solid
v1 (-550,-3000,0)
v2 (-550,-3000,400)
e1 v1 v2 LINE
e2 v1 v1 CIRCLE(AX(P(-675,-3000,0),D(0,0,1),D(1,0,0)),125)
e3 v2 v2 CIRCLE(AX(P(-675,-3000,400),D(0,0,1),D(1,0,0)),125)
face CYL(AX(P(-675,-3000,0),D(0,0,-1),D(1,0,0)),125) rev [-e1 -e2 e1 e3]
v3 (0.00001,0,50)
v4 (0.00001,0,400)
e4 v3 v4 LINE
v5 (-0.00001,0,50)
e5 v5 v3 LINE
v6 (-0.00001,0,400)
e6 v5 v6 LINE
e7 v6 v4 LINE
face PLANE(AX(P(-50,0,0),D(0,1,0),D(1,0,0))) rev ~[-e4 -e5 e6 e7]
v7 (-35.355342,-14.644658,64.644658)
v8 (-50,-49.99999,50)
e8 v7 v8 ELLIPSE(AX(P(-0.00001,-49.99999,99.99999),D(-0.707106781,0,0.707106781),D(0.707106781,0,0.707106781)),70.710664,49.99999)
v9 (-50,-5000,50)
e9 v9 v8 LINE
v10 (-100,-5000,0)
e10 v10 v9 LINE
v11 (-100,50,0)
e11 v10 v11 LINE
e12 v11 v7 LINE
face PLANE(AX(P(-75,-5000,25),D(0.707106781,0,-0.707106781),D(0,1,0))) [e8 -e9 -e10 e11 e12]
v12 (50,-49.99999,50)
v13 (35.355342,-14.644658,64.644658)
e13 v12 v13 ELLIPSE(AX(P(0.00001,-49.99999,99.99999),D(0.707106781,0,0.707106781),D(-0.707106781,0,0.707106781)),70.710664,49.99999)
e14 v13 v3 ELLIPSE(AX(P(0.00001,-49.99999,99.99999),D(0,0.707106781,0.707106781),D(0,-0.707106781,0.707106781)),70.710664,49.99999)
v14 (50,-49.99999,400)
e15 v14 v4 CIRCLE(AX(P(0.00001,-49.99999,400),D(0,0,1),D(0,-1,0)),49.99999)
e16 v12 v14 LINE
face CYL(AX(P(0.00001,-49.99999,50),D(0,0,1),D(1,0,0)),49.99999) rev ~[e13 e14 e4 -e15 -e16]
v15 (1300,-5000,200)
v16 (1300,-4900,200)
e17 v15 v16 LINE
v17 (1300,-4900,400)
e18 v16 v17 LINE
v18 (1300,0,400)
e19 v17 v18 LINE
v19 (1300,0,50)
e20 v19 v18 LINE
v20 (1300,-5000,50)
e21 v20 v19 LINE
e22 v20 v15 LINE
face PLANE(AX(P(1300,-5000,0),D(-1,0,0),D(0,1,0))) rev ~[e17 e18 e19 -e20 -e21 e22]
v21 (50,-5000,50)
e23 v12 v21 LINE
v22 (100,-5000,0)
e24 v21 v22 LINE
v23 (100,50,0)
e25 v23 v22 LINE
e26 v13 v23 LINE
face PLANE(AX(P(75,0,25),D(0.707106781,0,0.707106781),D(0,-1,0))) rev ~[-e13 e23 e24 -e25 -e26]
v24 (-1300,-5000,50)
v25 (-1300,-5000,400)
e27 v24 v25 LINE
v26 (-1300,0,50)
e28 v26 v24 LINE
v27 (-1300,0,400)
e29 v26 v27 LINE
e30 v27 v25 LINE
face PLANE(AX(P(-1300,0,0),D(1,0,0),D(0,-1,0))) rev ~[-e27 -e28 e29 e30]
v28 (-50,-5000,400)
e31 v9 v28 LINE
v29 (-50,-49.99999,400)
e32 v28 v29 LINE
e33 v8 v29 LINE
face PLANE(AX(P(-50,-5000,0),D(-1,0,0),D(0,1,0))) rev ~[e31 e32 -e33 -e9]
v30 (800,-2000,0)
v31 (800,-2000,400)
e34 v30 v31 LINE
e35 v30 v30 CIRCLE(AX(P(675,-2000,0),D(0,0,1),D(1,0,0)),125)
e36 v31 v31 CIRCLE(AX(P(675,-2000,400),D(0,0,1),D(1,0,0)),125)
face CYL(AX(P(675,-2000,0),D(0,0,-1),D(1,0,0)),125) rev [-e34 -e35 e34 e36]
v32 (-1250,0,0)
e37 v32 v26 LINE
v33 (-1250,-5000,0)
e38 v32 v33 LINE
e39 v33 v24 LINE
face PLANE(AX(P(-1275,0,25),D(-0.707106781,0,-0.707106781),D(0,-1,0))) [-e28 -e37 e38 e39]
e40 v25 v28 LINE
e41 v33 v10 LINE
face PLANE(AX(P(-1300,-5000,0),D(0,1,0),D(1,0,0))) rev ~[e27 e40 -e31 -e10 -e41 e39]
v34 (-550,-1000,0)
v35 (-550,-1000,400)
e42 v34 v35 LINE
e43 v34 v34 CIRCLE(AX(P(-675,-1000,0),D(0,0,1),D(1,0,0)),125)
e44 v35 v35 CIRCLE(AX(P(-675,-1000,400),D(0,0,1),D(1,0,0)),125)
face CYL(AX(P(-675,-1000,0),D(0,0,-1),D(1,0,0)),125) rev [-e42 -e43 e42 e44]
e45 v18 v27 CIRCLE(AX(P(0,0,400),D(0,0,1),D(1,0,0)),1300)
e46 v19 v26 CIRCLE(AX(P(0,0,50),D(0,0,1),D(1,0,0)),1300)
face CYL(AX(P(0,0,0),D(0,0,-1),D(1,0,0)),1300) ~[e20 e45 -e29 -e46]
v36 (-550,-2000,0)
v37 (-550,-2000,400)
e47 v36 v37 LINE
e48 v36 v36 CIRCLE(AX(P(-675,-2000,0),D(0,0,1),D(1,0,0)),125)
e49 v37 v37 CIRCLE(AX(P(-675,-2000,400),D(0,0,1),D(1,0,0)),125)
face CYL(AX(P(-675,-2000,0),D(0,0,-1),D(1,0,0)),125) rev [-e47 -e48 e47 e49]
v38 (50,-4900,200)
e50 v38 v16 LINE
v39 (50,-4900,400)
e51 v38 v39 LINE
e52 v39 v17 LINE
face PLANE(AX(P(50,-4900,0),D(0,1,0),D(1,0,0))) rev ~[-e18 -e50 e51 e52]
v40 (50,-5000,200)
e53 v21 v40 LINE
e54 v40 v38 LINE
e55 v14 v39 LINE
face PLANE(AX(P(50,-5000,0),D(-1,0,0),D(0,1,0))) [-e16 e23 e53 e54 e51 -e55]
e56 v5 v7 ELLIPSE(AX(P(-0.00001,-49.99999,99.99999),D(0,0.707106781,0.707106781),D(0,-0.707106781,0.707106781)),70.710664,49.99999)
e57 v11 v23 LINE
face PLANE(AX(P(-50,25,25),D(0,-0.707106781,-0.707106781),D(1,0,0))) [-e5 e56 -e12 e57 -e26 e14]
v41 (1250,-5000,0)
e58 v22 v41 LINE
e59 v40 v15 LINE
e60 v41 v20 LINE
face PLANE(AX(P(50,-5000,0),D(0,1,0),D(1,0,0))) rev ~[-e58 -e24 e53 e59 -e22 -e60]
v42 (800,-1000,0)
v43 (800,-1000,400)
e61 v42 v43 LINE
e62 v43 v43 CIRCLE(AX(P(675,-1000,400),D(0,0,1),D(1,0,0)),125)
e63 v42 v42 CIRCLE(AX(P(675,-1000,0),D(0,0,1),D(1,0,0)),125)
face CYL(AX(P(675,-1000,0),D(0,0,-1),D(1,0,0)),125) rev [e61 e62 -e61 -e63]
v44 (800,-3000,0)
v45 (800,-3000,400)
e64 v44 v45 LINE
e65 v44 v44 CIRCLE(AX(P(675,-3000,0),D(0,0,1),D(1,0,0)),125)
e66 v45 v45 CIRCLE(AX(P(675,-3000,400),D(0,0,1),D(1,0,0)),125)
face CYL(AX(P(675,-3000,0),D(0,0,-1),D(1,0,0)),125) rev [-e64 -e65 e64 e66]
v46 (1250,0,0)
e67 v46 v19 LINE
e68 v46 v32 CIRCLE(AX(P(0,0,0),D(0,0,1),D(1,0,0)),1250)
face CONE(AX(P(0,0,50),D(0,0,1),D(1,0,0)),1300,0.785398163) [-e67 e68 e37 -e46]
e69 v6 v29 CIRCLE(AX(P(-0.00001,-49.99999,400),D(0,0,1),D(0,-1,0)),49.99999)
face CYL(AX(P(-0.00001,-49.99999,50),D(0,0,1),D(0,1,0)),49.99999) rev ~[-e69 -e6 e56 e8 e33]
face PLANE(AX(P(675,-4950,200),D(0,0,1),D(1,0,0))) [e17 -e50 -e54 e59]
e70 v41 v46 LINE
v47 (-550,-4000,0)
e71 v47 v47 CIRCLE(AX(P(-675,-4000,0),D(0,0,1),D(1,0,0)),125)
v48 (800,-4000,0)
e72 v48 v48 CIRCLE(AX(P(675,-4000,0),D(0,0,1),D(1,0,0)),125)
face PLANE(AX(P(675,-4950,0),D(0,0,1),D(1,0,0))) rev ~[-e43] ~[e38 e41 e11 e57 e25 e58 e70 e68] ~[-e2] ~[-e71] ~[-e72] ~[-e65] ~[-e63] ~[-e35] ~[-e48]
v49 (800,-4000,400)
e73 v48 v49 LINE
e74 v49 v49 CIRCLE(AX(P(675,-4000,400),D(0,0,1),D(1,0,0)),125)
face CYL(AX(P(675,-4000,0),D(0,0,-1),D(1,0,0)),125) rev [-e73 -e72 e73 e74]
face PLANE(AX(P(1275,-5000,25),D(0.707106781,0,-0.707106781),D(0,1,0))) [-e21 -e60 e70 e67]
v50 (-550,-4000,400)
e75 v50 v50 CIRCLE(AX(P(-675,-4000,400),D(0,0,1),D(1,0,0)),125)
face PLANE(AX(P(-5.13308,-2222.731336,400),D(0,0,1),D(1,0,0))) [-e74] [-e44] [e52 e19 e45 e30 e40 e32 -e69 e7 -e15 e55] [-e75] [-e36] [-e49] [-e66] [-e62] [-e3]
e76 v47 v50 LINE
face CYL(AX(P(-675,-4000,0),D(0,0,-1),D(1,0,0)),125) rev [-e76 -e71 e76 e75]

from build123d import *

# Parameters (mm, degrees)
F0_R     = 125
F1_DEPTH = 400
F0_W     = 1250
F0_H     = 100
F2_DEPTH = 200
F3_SIZE  = 50
F4_R     = 49.99999


# Not quite as in the source:
# - a fillet or chamfer is up to 0.001 mm smaller than in the source, because OpenCascade refuses the exact size


with BuildPart() as f1:
    # F0 (on Top) → F1 (new body)
    with BuildSketch(Plane.XY):
        with BuildLine():
            Line((-50, 0), (0, 0))
            Line((0, 0), (50, 0))
            Line((50, 0), (50, -4900))
            Line((50, -4900), (1300, -4900))
            Line((1300, -4900), (1300, 0))
            ThreePointArc((1300, 0), (0, 1300), (-1300, 0))
            Line((-1300, 0), (-1300, -5000))
            Line((-1300, -5000), (-50, -5000))
            Line((-50, -5000), (-50, 0))
        make_face()
        with Locations((-675, -4000)):
            Circle(F0_R, mode=Mode.SUBTRACT)
        with Locations((-675, -3000)):
            Circle(F0_R, mode=Mode.SUBTRACT)
        with Locations((-675, -2000)):
            Circle(F0_R, mode=Mode.SUBTRACT)
        with Locations((675, -4000)):
            Circle(F0_R, mode=Mode.SUBTRACT)
        with Locations((675, -3000)):
            Circle(F0_R, mode=Mode.SUBTRACT)
        with Locations((675, -2000)):
            Circle(F0_R, mode=Mode.SUBTRACT)
        with Locations((-675, -1000)):
            Circle(F0_R, mode=Mode.SUBTRACT)
        with Locations((675, -1000)):
            Circle(F0_R, mode=Mode.SUBTRACT)
    extrude(amount=F1_DEPTH)

    # F0 (on Top) → F2 (join)
    with BuildSketch(Plane.XY):
        with Locations((675, -4950)):
            Rectangle(F0_W, F0_H)
    extrude(amount=F2_DEPTH)

    # F3
    f3_edges = [f1.edges().sort_by_distance(p)[0] for p in [
        (-1300, -2500, 0),
        (0, 1300, 0),
        (1300, -2500, 0),
        (-50, -2500, 0),
        (50, -2500, 0),
        (0, 0, 0),
    ]]
    chamfer(f3_edges, length=F3_SIZE)

    # F4 (radius 50 in the source; OpenCascade refuses exactly that, so slightly less here)
    f4_edges = [f1.edges().sort_by_distance(p)[0] for p in [
        (50, 0, 225),
        (-50, 0, 225),
    ]]
    fillet(f4_edges, radius=F4_R)


solid = f1.part
